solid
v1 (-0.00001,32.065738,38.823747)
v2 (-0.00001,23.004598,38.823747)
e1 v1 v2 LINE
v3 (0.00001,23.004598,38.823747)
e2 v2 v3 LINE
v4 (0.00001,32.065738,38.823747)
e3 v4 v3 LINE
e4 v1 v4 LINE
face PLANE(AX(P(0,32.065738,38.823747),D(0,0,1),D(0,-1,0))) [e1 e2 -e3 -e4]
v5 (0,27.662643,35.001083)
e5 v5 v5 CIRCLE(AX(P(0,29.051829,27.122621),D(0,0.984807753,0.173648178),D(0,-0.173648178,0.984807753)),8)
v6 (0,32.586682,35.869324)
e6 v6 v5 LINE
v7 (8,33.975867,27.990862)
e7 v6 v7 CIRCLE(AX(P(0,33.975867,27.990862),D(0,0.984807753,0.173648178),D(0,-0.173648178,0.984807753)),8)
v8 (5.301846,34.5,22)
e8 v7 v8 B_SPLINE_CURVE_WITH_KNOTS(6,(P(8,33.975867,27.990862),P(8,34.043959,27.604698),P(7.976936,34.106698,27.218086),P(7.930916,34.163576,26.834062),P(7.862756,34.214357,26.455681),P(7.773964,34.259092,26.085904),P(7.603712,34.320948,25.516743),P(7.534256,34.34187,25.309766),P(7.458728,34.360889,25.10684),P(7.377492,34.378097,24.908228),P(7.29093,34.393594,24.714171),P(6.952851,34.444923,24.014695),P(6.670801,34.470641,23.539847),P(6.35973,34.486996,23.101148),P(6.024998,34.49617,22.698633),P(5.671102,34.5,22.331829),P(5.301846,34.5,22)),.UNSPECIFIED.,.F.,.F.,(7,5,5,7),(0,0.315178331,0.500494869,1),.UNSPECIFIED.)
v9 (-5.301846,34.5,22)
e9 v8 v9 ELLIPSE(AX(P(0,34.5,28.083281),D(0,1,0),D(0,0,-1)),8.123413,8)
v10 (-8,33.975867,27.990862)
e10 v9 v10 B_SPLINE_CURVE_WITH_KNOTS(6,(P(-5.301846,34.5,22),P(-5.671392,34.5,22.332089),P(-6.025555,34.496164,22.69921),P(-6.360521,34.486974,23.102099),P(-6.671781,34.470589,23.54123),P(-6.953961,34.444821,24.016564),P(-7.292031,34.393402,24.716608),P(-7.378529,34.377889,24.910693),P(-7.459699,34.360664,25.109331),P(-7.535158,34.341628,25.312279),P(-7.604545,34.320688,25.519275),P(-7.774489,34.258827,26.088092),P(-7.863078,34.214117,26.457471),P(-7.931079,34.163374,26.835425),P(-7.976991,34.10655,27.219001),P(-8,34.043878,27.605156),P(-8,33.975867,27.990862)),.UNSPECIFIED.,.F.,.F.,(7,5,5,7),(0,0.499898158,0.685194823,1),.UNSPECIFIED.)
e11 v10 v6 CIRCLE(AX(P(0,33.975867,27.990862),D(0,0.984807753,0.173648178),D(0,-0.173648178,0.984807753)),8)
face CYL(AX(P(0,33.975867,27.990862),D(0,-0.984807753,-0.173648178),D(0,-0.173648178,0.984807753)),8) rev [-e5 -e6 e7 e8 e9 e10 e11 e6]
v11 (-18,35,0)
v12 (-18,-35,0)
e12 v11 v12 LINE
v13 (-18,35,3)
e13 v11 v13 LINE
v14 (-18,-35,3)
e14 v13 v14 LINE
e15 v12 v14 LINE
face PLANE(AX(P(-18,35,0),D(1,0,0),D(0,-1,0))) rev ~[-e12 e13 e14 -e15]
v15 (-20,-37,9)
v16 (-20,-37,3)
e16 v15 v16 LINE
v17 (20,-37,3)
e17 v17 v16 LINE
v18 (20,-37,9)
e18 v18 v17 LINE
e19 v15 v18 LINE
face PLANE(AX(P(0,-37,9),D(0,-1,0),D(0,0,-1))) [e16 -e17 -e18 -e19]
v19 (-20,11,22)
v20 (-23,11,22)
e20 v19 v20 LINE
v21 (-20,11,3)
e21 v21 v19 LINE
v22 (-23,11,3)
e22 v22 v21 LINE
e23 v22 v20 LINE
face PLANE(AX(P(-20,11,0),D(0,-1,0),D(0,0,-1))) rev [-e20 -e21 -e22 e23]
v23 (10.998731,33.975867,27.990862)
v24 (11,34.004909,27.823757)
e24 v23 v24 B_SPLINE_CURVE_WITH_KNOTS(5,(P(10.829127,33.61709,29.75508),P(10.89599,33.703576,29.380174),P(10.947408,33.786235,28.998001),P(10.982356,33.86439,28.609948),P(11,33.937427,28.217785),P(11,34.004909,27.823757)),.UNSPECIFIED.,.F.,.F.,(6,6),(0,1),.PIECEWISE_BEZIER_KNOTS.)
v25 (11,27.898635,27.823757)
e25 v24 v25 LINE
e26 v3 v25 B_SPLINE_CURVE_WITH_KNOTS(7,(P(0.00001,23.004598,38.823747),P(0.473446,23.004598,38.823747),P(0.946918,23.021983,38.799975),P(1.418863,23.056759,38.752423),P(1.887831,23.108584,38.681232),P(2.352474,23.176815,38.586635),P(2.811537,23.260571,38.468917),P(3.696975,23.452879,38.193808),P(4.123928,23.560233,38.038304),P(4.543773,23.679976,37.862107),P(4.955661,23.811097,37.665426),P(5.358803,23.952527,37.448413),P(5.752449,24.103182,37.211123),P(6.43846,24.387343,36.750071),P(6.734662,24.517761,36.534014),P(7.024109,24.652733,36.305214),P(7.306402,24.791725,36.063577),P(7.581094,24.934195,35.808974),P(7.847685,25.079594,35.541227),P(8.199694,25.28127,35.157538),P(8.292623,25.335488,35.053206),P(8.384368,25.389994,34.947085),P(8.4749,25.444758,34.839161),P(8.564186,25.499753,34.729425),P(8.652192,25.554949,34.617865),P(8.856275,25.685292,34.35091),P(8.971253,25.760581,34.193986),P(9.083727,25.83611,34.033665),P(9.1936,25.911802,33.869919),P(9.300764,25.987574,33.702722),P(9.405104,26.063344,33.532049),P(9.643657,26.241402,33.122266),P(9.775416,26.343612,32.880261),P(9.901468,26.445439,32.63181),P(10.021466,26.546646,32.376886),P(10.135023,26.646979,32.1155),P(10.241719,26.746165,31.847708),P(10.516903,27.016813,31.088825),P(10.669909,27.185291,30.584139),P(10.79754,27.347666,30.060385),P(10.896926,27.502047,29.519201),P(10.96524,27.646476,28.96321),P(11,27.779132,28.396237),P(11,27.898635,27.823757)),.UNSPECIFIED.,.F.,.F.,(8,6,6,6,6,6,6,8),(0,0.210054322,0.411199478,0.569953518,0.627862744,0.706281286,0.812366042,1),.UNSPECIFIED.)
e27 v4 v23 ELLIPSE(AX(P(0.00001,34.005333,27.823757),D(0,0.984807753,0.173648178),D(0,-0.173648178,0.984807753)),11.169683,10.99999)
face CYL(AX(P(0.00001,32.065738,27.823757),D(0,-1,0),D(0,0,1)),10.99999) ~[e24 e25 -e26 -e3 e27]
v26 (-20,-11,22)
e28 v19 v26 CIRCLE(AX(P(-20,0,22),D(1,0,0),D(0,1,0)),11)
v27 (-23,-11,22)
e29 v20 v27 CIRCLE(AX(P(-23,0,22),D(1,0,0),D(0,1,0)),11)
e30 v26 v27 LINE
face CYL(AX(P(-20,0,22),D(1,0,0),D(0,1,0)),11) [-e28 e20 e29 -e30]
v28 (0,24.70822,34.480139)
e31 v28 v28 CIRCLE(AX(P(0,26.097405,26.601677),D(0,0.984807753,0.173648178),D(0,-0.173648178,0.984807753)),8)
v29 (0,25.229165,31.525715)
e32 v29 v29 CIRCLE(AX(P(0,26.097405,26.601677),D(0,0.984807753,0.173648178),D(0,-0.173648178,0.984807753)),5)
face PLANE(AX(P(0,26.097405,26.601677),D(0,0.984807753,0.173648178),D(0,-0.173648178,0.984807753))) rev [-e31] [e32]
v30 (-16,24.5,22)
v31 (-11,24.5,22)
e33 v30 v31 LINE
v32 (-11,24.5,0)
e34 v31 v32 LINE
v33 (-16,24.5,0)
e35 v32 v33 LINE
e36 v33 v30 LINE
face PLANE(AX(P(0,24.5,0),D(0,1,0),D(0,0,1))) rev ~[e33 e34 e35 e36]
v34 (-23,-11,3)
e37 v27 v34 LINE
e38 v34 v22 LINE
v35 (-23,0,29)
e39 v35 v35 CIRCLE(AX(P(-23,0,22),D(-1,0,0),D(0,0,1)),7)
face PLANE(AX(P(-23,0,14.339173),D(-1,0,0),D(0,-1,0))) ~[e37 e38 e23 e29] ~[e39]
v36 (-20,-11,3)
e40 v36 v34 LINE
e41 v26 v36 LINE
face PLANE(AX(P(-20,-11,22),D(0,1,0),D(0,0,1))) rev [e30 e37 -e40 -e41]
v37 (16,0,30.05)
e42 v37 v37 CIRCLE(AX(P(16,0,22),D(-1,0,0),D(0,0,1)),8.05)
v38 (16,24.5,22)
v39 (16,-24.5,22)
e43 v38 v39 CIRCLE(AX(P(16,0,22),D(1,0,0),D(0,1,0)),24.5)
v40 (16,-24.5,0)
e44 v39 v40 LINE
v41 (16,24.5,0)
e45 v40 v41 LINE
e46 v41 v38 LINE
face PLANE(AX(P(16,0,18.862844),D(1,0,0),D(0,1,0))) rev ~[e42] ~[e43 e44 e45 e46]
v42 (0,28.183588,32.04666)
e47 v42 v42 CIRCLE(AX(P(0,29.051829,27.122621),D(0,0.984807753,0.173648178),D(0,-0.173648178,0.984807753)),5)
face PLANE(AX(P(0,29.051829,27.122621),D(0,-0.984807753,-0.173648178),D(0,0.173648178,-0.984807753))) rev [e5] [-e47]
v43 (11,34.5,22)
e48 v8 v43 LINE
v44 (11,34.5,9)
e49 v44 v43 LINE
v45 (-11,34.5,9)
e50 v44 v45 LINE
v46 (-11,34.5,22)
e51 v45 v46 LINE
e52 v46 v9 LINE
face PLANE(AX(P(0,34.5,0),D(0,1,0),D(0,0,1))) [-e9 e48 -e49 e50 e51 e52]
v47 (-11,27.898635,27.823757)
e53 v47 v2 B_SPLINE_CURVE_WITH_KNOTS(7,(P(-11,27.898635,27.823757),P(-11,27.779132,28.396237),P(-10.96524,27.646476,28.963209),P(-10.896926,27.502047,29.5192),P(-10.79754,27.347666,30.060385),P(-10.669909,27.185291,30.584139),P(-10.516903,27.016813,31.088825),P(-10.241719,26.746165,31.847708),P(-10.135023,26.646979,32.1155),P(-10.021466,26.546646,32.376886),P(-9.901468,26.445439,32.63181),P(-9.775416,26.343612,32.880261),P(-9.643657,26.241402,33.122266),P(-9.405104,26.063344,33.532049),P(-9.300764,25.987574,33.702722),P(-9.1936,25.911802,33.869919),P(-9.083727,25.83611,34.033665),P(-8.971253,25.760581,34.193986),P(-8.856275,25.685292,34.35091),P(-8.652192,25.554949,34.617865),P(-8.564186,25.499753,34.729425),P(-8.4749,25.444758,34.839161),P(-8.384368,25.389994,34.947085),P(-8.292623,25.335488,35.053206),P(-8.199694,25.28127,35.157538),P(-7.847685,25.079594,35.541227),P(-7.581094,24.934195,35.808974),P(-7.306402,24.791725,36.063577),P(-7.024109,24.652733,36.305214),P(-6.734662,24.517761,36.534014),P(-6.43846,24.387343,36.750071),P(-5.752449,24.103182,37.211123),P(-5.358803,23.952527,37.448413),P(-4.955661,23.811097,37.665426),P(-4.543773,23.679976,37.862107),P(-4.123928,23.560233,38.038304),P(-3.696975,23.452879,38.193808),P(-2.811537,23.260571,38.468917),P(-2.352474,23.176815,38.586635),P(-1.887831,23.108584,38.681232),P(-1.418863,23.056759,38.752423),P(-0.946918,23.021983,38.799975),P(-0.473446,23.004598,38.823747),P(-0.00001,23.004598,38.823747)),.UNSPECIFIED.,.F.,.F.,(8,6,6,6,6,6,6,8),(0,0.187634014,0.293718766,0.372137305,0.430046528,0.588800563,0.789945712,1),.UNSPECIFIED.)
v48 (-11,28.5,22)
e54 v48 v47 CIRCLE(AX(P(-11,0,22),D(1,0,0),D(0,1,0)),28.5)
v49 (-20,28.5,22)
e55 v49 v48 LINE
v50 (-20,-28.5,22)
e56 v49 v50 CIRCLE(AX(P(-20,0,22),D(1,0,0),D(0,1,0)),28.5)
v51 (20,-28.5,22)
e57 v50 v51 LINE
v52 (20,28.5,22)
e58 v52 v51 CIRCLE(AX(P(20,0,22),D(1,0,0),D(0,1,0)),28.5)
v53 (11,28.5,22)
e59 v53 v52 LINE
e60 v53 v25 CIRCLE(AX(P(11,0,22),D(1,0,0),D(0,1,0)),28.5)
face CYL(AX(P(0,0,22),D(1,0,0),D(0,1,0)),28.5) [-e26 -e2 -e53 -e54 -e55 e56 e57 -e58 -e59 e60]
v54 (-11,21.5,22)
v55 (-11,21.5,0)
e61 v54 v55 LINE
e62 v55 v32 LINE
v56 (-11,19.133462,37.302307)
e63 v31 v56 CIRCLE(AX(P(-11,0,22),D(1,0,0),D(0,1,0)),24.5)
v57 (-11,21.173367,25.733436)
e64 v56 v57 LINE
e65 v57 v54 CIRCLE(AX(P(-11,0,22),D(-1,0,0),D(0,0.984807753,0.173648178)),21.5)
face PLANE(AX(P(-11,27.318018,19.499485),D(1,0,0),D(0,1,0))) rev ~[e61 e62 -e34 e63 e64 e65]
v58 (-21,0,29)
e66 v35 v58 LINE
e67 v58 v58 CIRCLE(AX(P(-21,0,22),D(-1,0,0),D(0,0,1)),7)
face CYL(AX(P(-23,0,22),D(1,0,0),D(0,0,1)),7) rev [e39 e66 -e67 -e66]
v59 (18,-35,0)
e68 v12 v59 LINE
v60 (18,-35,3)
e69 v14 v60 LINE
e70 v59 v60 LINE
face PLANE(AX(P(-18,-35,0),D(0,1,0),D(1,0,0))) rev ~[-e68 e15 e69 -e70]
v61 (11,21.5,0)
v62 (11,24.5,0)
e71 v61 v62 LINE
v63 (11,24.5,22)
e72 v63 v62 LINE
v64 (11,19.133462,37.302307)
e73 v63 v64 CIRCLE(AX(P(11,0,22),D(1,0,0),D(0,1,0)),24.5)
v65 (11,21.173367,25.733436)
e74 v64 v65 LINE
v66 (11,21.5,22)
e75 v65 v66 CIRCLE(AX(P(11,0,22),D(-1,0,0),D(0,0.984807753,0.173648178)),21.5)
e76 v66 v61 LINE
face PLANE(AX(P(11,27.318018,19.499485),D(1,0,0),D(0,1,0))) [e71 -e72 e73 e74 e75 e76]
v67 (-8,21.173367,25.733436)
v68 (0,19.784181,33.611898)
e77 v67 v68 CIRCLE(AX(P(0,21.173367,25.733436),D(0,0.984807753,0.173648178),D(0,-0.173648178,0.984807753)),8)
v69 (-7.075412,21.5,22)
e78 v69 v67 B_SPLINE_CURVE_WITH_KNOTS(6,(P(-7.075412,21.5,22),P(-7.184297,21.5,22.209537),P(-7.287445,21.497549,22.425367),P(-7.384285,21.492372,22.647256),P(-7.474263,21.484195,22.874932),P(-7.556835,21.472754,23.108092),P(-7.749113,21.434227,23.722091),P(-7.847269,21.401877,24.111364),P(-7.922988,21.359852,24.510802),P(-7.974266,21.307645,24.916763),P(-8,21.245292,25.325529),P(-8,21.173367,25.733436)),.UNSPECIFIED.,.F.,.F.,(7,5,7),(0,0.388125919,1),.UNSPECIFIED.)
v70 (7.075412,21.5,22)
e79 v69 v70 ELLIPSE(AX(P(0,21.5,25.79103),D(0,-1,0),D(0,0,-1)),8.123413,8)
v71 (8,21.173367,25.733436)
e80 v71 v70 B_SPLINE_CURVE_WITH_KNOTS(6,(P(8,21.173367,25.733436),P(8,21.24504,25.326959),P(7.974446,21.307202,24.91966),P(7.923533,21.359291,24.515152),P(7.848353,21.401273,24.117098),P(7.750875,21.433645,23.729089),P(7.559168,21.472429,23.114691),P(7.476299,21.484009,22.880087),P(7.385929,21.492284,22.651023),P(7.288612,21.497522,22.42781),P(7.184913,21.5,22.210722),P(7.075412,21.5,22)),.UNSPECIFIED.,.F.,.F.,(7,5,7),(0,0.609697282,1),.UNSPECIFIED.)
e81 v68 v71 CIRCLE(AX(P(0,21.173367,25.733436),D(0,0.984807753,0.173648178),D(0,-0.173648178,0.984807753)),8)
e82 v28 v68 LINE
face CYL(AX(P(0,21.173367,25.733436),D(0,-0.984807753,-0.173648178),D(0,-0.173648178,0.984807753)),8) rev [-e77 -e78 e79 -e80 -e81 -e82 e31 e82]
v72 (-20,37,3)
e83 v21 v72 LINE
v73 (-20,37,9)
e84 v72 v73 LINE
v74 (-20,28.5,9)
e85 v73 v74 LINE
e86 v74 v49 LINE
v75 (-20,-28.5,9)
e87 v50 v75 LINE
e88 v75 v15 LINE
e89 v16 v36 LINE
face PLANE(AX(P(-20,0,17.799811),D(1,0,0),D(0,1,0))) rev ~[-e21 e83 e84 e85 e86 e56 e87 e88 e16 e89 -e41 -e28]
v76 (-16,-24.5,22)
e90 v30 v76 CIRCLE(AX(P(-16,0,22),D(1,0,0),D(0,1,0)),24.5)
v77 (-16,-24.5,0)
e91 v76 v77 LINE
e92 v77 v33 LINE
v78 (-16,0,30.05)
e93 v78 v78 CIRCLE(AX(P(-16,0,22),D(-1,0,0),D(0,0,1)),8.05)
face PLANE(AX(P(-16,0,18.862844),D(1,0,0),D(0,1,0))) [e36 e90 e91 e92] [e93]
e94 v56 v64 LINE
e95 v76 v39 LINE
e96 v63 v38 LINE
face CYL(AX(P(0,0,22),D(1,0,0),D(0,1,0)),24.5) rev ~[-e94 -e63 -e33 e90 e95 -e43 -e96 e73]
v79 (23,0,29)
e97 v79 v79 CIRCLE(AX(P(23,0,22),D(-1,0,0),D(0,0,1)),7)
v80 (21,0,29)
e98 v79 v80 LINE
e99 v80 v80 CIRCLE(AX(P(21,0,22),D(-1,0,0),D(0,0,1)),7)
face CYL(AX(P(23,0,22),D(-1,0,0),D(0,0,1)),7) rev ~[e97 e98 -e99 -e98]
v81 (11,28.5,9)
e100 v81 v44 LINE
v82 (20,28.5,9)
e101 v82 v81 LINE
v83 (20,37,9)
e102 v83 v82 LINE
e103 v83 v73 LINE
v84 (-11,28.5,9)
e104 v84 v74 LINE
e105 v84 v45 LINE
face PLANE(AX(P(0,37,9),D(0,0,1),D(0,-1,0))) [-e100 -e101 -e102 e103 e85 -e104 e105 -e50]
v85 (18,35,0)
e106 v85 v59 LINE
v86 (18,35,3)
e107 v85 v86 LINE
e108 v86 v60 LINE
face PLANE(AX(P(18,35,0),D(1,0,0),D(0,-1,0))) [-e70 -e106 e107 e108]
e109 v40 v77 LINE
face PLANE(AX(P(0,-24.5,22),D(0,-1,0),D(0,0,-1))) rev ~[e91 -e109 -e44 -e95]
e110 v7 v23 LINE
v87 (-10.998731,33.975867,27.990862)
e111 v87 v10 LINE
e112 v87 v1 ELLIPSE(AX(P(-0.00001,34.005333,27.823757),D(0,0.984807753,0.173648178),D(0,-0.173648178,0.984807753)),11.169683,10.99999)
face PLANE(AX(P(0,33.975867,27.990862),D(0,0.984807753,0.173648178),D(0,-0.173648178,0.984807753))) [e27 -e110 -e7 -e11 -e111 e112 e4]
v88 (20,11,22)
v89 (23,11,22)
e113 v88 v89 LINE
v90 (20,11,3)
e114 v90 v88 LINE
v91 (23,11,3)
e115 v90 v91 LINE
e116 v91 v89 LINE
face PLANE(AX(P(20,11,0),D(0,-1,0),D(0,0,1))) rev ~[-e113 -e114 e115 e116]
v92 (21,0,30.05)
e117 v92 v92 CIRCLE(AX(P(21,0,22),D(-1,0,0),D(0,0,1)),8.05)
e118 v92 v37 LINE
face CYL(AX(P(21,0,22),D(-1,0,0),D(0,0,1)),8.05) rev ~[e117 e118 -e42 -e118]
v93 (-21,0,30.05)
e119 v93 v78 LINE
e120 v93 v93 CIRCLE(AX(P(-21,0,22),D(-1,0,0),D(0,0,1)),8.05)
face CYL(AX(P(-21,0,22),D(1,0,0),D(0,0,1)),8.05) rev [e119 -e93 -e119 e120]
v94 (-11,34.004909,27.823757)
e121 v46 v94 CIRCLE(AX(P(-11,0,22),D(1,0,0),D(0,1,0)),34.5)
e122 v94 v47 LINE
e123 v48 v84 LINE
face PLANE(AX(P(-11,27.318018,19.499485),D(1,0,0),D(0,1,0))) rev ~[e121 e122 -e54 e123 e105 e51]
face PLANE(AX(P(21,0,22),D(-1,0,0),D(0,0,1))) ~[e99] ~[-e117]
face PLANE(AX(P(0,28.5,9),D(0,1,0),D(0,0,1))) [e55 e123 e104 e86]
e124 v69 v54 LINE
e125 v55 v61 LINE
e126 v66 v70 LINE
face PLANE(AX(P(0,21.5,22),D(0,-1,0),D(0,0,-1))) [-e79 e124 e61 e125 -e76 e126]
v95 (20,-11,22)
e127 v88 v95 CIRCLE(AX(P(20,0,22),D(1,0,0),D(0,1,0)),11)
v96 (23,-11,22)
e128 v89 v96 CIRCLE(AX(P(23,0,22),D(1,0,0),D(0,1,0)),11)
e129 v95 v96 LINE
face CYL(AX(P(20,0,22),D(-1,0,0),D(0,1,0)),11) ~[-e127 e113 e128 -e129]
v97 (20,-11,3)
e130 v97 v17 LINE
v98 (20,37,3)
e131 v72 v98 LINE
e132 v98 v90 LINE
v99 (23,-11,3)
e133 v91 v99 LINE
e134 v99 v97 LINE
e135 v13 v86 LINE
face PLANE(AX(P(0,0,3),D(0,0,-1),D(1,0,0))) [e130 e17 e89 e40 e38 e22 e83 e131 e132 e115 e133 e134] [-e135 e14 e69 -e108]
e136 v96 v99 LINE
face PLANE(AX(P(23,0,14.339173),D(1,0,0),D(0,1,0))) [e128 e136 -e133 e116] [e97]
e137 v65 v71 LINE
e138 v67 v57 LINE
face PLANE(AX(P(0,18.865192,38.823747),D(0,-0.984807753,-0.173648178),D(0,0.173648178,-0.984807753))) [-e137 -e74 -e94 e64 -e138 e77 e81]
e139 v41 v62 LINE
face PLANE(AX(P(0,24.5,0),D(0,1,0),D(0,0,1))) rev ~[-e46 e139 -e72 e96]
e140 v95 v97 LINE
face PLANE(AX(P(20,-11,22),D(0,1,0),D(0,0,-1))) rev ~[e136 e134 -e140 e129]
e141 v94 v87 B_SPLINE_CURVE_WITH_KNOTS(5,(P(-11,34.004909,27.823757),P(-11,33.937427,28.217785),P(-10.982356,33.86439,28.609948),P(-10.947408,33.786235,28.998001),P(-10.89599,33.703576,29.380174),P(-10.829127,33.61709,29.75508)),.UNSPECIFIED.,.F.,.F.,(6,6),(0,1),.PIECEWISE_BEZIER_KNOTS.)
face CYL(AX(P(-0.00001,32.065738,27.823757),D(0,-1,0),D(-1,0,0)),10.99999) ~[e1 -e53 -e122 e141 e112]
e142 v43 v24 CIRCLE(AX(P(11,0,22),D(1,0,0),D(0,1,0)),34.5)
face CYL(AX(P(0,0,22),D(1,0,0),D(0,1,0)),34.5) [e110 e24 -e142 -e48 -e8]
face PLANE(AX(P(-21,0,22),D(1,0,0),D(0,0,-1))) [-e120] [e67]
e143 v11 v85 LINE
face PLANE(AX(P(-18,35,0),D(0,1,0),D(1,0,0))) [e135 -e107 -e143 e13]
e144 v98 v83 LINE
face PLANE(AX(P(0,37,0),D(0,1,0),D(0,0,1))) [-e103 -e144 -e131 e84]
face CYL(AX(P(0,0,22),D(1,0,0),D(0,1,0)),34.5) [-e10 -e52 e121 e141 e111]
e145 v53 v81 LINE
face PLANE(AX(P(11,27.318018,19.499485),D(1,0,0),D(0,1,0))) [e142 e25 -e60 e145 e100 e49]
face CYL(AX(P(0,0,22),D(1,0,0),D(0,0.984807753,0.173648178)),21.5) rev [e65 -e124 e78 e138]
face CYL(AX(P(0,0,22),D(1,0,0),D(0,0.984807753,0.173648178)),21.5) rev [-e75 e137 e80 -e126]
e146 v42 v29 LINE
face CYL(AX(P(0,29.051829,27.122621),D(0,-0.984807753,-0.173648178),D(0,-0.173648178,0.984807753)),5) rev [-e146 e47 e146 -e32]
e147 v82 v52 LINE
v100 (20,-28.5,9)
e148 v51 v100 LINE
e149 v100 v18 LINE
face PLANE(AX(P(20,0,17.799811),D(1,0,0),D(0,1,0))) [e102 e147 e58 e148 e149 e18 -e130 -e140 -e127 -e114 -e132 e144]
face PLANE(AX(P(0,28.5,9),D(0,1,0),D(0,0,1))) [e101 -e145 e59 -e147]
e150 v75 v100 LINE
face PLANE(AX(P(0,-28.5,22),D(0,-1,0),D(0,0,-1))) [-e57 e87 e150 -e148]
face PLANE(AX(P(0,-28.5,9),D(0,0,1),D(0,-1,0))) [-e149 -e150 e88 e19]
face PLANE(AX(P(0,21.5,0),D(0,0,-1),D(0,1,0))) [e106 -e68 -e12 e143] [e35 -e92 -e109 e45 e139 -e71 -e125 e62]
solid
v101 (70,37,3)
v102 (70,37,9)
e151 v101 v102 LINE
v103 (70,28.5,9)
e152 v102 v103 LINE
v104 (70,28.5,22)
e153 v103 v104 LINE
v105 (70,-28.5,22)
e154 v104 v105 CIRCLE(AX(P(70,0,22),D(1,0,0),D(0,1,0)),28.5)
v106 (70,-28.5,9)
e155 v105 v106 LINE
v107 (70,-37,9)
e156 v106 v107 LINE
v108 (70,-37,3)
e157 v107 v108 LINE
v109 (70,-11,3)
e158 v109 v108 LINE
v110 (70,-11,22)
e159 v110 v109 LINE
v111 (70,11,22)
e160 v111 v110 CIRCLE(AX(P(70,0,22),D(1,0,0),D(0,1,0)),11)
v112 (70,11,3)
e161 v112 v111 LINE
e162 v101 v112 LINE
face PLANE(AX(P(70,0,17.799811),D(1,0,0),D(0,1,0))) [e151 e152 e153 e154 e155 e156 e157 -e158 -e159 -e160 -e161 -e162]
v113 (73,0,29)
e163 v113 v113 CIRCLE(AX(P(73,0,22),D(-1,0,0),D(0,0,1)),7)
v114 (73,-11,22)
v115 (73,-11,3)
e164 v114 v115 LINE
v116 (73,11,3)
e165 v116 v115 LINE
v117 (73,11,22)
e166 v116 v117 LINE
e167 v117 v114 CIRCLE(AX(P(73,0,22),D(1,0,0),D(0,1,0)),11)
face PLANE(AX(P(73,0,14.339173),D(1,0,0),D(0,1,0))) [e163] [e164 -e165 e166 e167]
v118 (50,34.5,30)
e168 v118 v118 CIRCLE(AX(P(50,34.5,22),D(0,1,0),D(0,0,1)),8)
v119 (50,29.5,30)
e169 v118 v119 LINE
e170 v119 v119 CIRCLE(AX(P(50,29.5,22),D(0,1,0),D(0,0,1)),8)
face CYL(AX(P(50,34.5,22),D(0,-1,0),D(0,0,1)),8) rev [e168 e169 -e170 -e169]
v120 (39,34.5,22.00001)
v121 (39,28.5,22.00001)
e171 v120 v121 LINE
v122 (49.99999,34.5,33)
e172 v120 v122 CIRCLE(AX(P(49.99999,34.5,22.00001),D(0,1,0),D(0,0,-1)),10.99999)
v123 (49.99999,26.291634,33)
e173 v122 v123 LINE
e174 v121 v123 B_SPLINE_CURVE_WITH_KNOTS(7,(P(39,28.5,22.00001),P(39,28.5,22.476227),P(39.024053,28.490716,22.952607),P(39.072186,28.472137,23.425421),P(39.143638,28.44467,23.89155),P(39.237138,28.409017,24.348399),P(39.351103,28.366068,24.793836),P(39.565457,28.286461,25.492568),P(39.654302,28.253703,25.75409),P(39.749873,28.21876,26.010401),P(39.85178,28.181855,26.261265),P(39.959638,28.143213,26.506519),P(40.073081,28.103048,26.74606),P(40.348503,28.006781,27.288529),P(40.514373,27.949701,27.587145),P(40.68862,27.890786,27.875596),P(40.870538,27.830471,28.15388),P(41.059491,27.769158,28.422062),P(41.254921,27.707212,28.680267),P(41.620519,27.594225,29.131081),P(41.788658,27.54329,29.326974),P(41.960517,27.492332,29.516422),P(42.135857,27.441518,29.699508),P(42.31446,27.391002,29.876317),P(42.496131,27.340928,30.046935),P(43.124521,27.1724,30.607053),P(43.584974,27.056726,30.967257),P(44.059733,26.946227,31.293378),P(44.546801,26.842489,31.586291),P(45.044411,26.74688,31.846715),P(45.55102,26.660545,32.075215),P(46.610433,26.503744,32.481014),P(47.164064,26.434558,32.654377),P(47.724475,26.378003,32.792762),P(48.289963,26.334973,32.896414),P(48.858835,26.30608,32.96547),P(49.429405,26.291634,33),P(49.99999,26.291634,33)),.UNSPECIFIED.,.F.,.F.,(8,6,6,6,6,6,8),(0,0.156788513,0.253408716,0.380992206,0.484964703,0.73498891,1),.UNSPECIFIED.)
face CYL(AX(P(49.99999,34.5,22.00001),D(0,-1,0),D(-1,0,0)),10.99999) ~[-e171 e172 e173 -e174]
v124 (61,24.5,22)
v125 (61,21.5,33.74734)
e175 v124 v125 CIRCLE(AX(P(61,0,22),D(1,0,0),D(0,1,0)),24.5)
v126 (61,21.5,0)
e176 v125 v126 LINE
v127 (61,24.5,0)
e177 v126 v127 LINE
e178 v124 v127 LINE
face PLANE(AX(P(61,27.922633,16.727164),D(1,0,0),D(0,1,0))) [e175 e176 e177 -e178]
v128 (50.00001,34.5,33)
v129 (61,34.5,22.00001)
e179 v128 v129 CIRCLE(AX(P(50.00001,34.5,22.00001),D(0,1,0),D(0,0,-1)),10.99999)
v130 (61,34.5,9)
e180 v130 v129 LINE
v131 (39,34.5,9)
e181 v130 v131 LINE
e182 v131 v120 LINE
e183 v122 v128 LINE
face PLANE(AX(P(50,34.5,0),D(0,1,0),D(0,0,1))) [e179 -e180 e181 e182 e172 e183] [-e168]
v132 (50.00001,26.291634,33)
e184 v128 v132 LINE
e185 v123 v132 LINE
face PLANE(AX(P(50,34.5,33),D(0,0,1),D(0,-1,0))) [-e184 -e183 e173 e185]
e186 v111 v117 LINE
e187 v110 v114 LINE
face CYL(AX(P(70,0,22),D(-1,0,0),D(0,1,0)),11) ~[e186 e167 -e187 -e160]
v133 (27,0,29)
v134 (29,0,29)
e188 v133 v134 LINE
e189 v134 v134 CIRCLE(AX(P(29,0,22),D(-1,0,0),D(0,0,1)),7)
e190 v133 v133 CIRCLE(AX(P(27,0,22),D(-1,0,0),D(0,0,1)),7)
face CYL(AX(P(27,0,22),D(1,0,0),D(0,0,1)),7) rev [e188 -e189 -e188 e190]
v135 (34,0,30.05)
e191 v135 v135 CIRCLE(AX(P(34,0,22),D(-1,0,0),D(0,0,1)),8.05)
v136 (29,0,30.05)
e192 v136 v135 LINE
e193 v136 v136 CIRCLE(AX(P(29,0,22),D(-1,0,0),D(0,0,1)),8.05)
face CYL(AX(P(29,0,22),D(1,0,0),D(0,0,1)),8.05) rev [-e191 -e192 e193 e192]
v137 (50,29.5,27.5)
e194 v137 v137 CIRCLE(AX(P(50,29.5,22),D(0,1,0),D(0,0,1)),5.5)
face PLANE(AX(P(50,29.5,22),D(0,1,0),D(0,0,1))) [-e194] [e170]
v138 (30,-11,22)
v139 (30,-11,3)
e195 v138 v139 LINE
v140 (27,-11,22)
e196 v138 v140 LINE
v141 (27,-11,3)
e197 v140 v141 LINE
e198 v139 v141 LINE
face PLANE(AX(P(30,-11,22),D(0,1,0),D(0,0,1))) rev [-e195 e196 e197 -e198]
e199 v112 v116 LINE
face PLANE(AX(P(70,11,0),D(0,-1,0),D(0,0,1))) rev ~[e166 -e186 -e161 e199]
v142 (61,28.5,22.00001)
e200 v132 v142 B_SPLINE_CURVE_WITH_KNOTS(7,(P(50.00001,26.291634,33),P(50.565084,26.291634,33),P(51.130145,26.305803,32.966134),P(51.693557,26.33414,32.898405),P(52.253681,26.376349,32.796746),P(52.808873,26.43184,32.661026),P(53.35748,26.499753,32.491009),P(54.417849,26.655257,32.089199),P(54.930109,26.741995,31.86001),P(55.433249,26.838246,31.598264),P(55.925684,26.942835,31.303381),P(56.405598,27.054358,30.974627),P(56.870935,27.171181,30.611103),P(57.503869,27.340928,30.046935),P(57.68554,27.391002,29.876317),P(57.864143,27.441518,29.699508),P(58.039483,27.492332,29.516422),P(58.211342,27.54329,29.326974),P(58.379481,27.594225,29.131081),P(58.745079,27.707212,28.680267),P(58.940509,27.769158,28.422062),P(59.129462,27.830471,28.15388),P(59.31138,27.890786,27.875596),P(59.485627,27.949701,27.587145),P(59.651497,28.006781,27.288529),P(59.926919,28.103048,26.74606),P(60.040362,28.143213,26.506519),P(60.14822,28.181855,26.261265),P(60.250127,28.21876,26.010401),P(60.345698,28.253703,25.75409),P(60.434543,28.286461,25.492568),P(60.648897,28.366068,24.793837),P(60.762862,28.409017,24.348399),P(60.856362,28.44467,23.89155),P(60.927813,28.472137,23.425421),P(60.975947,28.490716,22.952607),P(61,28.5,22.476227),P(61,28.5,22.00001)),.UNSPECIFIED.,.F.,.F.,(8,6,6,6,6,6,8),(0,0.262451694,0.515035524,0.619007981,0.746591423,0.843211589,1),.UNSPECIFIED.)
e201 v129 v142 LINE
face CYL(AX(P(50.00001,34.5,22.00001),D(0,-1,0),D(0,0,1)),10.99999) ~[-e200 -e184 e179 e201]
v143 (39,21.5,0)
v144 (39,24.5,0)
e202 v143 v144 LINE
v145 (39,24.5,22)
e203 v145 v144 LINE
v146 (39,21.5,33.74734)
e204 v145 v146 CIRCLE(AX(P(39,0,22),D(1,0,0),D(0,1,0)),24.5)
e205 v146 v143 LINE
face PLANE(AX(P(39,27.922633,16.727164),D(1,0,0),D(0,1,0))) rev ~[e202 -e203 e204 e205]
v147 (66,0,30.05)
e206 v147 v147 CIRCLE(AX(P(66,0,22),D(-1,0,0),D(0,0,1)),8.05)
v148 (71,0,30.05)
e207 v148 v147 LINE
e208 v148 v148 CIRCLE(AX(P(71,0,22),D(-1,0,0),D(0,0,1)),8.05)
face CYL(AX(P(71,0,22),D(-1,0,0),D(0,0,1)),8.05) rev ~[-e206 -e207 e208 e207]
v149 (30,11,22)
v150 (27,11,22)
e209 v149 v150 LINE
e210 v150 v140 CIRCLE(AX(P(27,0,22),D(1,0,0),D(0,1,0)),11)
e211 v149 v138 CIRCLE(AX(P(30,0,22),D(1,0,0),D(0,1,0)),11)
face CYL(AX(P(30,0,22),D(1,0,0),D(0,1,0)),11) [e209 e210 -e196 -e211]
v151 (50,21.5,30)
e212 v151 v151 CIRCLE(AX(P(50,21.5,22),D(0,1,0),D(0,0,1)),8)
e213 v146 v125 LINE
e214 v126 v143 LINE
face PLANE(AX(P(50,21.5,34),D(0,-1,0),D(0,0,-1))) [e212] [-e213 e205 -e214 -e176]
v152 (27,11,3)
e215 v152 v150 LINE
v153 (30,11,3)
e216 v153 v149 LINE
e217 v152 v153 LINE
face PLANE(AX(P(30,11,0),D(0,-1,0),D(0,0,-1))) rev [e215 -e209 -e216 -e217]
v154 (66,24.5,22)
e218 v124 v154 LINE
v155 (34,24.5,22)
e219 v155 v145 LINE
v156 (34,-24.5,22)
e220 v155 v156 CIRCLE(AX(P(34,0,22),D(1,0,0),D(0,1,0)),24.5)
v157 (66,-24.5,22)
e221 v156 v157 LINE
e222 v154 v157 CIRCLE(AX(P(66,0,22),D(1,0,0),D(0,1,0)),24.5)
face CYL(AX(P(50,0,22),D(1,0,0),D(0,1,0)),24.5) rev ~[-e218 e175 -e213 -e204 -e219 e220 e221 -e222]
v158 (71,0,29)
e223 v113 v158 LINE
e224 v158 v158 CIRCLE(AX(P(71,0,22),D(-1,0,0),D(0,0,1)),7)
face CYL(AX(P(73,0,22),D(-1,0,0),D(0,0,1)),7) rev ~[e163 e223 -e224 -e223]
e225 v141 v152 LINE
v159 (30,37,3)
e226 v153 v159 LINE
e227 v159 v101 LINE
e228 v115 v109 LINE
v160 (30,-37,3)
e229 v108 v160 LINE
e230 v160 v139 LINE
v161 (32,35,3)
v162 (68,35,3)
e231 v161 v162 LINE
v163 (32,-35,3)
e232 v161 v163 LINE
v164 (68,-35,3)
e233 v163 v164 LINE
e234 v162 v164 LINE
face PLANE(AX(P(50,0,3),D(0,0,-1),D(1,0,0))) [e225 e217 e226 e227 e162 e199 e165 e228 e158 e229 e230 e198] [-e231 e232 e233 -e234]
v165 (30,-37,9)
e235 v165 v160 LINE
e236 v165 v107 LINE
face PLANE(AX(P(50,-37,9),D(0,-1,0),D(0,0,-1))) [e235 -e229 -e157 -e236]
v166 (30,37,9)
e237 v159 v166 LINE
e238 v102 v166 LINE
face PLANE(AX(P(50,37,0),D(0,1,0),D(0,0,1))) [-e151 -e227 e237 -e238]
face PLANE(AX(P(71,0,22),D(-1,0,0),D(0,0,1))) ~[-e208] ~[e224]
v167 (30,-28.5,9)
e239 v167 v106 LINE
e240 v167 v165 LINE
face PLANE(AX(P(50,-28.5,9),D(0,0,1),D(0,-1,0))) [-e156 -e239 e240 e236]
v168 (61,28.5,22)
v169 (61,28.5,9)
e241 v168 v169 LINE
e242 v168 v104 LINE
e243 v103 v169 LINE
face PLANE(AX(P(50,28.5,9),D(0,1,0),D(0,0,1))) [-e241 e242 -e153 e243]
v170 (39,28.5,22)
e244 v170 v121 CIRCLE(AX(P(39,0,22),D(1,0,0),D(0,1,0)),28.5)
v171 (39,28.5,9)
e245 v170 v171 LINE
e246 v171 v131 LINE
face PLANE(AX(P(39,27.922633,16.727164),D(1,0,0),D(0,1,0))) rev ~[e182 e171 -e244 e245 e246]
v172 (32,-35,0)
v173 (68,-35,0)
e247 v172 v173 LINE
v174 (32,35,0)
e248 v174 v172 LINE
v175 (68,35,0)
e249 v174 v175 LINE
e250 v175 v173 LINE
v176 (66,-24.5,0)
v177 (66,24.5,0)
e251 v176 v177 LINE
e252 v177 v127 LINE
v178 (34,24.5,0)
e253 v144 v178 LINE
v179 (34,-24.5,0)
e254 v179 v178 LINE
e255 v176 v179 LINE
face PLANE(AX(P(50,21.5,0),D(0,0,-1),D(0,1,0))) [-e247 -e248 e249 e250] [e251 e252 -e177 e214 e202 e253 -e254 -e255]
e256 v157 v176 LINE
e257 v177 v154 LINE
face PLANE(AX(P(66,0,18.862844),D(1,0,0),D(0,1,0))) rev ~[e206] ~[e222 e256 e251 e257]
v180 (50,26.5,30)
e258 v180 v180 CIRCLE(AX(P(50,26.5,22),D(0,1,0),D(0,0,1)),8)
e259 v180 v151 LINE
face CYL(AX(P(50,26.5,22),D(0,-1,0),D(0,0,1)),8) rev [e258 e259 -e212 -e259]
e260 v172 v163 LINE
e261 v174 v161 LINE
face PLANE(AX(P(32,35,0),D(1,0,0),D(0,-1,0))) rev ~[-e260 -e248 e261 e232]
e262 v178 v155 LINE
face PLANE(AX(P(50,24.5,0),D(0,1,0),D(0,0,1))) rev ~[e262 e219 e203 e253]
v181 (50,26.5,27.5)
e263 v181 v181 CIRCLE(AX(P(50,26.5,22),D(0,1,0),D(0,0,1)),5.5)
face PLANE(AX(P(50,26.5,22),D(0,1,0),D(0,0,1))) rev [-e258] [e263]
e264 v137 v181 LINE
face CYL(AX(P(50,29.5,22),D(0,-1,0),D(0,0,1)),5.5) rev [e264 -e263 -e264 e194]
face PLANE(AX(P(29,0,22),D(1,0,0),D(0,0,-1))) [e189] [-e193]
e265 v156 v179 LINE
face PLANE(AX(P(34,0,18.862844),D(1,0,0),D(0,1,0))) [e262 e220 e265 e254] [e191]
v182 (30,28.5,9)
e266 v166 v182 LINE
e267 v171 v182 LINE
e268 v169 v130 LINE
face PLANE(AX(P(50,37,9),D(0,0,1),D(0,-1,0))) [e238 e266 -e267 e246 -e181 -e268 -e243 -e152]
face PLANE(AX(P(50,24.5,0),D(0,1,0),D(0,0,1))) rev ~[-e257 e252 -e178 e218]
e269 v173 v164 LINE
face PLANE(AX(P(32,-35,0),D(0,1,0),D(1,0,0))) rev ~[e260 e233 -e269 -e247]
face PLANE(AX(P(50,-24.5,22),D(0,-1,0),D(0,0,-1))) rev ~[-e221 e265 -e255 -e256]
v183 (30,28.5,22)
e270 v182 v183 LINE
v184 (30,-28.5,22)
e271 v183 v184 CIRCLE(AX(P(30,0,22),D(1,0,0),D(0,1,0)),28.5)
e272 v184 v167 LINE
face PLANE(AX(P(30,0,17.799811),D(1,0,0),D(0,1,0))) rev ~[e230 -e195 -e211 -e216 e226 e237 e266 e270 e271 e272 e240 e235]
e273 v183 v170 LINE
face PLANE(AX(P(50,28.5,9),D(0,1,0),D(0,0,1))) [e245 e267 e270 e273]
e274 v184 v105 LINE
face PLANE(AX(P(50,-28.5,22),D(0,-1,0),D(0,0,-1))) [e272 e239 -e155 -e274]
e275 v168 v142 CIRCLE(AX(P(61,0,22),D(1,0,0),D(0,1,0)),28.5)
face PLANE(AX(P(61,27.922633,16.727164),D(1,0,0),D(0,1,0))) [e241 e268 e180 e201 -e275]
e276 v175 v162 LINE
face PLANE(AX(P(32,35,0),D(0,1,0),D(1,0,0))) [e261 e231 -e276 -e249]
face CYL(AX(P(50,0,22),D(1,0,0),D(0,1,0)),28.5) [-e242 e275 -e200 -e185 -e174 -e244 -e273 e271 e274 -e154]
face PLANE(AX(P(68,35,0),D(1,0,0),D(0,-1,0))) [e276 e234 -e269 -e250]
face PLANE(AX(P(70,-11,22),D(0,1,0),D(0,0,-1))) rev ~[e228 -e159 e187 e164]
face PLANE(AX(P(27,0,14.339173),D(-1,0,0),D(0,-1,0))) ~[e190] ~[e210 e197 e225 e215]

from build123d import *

# Parameters (mm, degrees)
F1_DEPTH  = 20
F3_DEPTH  = 16
F5_DEPTH  = 3
F8_W      = 36
F8_H      = 70
F9_DEPTH  = 3
F13_DEPTH = 11
F14_R     = 10.99999
F18_DEPTH = 11
F21_R     = 10.99999


# Not quite as in the source:
# - a fillet or chamfer is up to 0.001 mm smaller than in the source, because OpenCascade refuses the exact size
# - a pattern or mirror of a feature is missing from the dataset's text; its kind, count and spacing are read off the source's solid


with BuildPart() as f1:
    # F0 (on Right) → F1 (new body, symmetric)
    with BuildSketch(Plane.YZ):
        with BuildLine():
            Line((28.5, 9), (28.5, 22))
            ThreePointArc((28.5, 22), (0, 50.5), (-28.5, 22))
            Line((-28.5, 22), (-28.5, 9))
            Line((-28.5, 9), (-37, 9))
            Line((-37, 9), (-37, 0))
            Line((-37, 0), (37, 0))
            Line((37, 0), (37, 9))
            Line((37, 9), (28.5, 9))
        make_face()
    extrude(amount=F1_DEPTH, both=True)

    # F2 (on Right) → F3 (cut, symmetric)
    with BuildSketch(Plane.YZ):
        with BuildLine():
            Line((24.5, 0), (24.5, 22))
            ThreePointArc((24.5, 22), (0, 46.5), (-24.5, 22))
            Line((-24.5, 22), (-24.5, 0))
            Line((-24.5, 0), (24.5, 0))
        make_face()
    extrude(amount=F3_DEPTH, both=True, mode=Mode.SUBTRACT)

    # F4 (on face) → F5 (join)
    with BuildSketch(Plane.YZ.offset(20)):
        with BuildLine():
            Line((11, 0), (11, 22))
            ThreePointArc((11, 22), (0, 33), (-11, 22))
            Line((-11, 22), (-11, 0))
            Line((-11, 0), (11, 0))
        make_face()
    f5 = extrude(amount=F5_DEPTH)

    # F5_copies: F5 across plane
    add(f5.mirror(Plane(origin=(0, 0, 0), x_dir=(0, 0, -1), z_dir=(-1, 0, 0))))

    # F6 (on Front) → F7 (revolve, cut)
    with BuildSketch(Plane.XZ):
        Polygon((16, 30.05), (16, 22), (23, 22), (23, 29), (21, 29), (21, 30.05), align=None)
    f7 = revolve(axis=Axis((24.6842799243, 0, 22), (-1, 0, 0)), mode=Mode.SUBTRACT)

    # F7_copies: F7 across plane
    add(f7.mirror(Plane(origin=(0, 0, 0), x_dir=(0, 0, -1), z_dir=(-1, 0, 0))), mode=Mode.SUBTRACT)

    # F8 (on face) → F9 (cut)
    with BuildSketch(Plane(origin=(0, 0, 0), x_dir=(1, 0, 0), z_dir=(0, 0, -1))):
        Polygon((20, 37), (-20, 37), (-20, 11), (-23, 11), (-23, -11), (-20, -11), (-20, -37), (20, -37), (20, -11), (23, -11), (23, 11), (20, 11), align=None)
        Rectangle(F8_W, F8_H, mode=Mode.SUBTRACT)
    extrude(amount=-F9_DEPTH, mode=Mode.SUBTRACT)


with BuildPart() as f10_1:
    # F10: copy of F1
    add(f1.part.moved(Location((50, 0, 0))))

    # F12 (on mid) → F13 (join, symmetric)
    with BuildSketch(Plane.YZ.offset(50)):
        Polygon((21.5, 33), (21.5, 0), (34.5, 0), (34.5, 33), (24.8438753188, 33), (21.5, 34), align=None)
    extrude(amount=F13_DEPTH, both=True)

    # F14 (radius 11 in the source; OpenCascade refuses exactly that, so slightly less here)
    f14_edges = [f10_1.edges().sort_by_distance(p)[0] for p in [
        (61, 30.395817, 33),
        (39, 30.395817, 33),
    ]]
    fillet(f14_edges, radius=F14_R)

    # F15 (on mid) → F16 (revolve, cut)
    with BuildSketch(Plane.YZ.offset(50)):
        Polygon((21.5, 30), (21.5, 22), (34.5, 22), (34.5, 30), (29.5, 30), (29.5, 27.5), (26.5, 27.5), (26.5, 30), align=None)
    revolve(axis=Axis((50, 24.9189473689, 22), (0, 1, 0)), mode=Mode.SUBTRACT)


with BuildPart() as f1_1:
    add(f1.part)

    # F17 (on Right) → F18 (join, symmetric)
    with BuildSketch(Plane.YZ):
        with BuildLine():
            Line((21.5, 22), (21.5, 0))
            Line((21.5, 0), (34.5, 0))
            Line((34.5, 0), (34.5, 22))
            ThreePointArc((34.5, 22), (34.3687170842, 25.0068731248), (33.9758674789, 27.9908621295))
            Line((33.9758674789, 27.9908621295), (32.0657375246, 38.8237474126))
            Line((32.0657375246, 38.8237474126), (18.8651915701, 38.8237474126))
            Line((18.8651915701, 38.8237474126), (21.1733666898, 25.7334358198))
            ThreePointArc((21.1733666898, 25.7334358198), (21.418186009, 23.8738484691), (21.5, 22))
        make_face()
    extrude(amount=F18_DEPTH, both=True)

    # F19 (on Right) → F20 (revolve, cut)
    with BuildSketch(Plane.YZ):
        Polygon((27.6626432925, 35.0010832653), (28.1835878255, 32.0466600062), (25.2291645665, 31.5257154732), (24.7082200335, 34.4801387323), (19.7841812684, 33.6118978439), (16.8297580094, 33.0909533109), (18.2189434307, 25.2124912868), (21.1733666898, 25.7334358198), (33.9758674789, 27.9908621295), (32.5866820576, 35.8693241536), align=None)
    revolve(axis=Axis((0, 21.387808256, 25.7712476538), (0, 0.984807753, 0.1736481777)), mode=Mode.SUBTRACT)

    # F21 (radius 11 in the source; OpenCascade refuses exactly that, so slightly less here)
    f21_edges = [f1_1.edges().sort_by_distance(p)[0] for p in [
        (-11, 27.535168, 38.823747),
        (11, 27.535168, 38.823747),
    ]]
    fillet(f21_edges, radius=F21_R)


solid = Compound([f10_1.part, f1_1.part])
